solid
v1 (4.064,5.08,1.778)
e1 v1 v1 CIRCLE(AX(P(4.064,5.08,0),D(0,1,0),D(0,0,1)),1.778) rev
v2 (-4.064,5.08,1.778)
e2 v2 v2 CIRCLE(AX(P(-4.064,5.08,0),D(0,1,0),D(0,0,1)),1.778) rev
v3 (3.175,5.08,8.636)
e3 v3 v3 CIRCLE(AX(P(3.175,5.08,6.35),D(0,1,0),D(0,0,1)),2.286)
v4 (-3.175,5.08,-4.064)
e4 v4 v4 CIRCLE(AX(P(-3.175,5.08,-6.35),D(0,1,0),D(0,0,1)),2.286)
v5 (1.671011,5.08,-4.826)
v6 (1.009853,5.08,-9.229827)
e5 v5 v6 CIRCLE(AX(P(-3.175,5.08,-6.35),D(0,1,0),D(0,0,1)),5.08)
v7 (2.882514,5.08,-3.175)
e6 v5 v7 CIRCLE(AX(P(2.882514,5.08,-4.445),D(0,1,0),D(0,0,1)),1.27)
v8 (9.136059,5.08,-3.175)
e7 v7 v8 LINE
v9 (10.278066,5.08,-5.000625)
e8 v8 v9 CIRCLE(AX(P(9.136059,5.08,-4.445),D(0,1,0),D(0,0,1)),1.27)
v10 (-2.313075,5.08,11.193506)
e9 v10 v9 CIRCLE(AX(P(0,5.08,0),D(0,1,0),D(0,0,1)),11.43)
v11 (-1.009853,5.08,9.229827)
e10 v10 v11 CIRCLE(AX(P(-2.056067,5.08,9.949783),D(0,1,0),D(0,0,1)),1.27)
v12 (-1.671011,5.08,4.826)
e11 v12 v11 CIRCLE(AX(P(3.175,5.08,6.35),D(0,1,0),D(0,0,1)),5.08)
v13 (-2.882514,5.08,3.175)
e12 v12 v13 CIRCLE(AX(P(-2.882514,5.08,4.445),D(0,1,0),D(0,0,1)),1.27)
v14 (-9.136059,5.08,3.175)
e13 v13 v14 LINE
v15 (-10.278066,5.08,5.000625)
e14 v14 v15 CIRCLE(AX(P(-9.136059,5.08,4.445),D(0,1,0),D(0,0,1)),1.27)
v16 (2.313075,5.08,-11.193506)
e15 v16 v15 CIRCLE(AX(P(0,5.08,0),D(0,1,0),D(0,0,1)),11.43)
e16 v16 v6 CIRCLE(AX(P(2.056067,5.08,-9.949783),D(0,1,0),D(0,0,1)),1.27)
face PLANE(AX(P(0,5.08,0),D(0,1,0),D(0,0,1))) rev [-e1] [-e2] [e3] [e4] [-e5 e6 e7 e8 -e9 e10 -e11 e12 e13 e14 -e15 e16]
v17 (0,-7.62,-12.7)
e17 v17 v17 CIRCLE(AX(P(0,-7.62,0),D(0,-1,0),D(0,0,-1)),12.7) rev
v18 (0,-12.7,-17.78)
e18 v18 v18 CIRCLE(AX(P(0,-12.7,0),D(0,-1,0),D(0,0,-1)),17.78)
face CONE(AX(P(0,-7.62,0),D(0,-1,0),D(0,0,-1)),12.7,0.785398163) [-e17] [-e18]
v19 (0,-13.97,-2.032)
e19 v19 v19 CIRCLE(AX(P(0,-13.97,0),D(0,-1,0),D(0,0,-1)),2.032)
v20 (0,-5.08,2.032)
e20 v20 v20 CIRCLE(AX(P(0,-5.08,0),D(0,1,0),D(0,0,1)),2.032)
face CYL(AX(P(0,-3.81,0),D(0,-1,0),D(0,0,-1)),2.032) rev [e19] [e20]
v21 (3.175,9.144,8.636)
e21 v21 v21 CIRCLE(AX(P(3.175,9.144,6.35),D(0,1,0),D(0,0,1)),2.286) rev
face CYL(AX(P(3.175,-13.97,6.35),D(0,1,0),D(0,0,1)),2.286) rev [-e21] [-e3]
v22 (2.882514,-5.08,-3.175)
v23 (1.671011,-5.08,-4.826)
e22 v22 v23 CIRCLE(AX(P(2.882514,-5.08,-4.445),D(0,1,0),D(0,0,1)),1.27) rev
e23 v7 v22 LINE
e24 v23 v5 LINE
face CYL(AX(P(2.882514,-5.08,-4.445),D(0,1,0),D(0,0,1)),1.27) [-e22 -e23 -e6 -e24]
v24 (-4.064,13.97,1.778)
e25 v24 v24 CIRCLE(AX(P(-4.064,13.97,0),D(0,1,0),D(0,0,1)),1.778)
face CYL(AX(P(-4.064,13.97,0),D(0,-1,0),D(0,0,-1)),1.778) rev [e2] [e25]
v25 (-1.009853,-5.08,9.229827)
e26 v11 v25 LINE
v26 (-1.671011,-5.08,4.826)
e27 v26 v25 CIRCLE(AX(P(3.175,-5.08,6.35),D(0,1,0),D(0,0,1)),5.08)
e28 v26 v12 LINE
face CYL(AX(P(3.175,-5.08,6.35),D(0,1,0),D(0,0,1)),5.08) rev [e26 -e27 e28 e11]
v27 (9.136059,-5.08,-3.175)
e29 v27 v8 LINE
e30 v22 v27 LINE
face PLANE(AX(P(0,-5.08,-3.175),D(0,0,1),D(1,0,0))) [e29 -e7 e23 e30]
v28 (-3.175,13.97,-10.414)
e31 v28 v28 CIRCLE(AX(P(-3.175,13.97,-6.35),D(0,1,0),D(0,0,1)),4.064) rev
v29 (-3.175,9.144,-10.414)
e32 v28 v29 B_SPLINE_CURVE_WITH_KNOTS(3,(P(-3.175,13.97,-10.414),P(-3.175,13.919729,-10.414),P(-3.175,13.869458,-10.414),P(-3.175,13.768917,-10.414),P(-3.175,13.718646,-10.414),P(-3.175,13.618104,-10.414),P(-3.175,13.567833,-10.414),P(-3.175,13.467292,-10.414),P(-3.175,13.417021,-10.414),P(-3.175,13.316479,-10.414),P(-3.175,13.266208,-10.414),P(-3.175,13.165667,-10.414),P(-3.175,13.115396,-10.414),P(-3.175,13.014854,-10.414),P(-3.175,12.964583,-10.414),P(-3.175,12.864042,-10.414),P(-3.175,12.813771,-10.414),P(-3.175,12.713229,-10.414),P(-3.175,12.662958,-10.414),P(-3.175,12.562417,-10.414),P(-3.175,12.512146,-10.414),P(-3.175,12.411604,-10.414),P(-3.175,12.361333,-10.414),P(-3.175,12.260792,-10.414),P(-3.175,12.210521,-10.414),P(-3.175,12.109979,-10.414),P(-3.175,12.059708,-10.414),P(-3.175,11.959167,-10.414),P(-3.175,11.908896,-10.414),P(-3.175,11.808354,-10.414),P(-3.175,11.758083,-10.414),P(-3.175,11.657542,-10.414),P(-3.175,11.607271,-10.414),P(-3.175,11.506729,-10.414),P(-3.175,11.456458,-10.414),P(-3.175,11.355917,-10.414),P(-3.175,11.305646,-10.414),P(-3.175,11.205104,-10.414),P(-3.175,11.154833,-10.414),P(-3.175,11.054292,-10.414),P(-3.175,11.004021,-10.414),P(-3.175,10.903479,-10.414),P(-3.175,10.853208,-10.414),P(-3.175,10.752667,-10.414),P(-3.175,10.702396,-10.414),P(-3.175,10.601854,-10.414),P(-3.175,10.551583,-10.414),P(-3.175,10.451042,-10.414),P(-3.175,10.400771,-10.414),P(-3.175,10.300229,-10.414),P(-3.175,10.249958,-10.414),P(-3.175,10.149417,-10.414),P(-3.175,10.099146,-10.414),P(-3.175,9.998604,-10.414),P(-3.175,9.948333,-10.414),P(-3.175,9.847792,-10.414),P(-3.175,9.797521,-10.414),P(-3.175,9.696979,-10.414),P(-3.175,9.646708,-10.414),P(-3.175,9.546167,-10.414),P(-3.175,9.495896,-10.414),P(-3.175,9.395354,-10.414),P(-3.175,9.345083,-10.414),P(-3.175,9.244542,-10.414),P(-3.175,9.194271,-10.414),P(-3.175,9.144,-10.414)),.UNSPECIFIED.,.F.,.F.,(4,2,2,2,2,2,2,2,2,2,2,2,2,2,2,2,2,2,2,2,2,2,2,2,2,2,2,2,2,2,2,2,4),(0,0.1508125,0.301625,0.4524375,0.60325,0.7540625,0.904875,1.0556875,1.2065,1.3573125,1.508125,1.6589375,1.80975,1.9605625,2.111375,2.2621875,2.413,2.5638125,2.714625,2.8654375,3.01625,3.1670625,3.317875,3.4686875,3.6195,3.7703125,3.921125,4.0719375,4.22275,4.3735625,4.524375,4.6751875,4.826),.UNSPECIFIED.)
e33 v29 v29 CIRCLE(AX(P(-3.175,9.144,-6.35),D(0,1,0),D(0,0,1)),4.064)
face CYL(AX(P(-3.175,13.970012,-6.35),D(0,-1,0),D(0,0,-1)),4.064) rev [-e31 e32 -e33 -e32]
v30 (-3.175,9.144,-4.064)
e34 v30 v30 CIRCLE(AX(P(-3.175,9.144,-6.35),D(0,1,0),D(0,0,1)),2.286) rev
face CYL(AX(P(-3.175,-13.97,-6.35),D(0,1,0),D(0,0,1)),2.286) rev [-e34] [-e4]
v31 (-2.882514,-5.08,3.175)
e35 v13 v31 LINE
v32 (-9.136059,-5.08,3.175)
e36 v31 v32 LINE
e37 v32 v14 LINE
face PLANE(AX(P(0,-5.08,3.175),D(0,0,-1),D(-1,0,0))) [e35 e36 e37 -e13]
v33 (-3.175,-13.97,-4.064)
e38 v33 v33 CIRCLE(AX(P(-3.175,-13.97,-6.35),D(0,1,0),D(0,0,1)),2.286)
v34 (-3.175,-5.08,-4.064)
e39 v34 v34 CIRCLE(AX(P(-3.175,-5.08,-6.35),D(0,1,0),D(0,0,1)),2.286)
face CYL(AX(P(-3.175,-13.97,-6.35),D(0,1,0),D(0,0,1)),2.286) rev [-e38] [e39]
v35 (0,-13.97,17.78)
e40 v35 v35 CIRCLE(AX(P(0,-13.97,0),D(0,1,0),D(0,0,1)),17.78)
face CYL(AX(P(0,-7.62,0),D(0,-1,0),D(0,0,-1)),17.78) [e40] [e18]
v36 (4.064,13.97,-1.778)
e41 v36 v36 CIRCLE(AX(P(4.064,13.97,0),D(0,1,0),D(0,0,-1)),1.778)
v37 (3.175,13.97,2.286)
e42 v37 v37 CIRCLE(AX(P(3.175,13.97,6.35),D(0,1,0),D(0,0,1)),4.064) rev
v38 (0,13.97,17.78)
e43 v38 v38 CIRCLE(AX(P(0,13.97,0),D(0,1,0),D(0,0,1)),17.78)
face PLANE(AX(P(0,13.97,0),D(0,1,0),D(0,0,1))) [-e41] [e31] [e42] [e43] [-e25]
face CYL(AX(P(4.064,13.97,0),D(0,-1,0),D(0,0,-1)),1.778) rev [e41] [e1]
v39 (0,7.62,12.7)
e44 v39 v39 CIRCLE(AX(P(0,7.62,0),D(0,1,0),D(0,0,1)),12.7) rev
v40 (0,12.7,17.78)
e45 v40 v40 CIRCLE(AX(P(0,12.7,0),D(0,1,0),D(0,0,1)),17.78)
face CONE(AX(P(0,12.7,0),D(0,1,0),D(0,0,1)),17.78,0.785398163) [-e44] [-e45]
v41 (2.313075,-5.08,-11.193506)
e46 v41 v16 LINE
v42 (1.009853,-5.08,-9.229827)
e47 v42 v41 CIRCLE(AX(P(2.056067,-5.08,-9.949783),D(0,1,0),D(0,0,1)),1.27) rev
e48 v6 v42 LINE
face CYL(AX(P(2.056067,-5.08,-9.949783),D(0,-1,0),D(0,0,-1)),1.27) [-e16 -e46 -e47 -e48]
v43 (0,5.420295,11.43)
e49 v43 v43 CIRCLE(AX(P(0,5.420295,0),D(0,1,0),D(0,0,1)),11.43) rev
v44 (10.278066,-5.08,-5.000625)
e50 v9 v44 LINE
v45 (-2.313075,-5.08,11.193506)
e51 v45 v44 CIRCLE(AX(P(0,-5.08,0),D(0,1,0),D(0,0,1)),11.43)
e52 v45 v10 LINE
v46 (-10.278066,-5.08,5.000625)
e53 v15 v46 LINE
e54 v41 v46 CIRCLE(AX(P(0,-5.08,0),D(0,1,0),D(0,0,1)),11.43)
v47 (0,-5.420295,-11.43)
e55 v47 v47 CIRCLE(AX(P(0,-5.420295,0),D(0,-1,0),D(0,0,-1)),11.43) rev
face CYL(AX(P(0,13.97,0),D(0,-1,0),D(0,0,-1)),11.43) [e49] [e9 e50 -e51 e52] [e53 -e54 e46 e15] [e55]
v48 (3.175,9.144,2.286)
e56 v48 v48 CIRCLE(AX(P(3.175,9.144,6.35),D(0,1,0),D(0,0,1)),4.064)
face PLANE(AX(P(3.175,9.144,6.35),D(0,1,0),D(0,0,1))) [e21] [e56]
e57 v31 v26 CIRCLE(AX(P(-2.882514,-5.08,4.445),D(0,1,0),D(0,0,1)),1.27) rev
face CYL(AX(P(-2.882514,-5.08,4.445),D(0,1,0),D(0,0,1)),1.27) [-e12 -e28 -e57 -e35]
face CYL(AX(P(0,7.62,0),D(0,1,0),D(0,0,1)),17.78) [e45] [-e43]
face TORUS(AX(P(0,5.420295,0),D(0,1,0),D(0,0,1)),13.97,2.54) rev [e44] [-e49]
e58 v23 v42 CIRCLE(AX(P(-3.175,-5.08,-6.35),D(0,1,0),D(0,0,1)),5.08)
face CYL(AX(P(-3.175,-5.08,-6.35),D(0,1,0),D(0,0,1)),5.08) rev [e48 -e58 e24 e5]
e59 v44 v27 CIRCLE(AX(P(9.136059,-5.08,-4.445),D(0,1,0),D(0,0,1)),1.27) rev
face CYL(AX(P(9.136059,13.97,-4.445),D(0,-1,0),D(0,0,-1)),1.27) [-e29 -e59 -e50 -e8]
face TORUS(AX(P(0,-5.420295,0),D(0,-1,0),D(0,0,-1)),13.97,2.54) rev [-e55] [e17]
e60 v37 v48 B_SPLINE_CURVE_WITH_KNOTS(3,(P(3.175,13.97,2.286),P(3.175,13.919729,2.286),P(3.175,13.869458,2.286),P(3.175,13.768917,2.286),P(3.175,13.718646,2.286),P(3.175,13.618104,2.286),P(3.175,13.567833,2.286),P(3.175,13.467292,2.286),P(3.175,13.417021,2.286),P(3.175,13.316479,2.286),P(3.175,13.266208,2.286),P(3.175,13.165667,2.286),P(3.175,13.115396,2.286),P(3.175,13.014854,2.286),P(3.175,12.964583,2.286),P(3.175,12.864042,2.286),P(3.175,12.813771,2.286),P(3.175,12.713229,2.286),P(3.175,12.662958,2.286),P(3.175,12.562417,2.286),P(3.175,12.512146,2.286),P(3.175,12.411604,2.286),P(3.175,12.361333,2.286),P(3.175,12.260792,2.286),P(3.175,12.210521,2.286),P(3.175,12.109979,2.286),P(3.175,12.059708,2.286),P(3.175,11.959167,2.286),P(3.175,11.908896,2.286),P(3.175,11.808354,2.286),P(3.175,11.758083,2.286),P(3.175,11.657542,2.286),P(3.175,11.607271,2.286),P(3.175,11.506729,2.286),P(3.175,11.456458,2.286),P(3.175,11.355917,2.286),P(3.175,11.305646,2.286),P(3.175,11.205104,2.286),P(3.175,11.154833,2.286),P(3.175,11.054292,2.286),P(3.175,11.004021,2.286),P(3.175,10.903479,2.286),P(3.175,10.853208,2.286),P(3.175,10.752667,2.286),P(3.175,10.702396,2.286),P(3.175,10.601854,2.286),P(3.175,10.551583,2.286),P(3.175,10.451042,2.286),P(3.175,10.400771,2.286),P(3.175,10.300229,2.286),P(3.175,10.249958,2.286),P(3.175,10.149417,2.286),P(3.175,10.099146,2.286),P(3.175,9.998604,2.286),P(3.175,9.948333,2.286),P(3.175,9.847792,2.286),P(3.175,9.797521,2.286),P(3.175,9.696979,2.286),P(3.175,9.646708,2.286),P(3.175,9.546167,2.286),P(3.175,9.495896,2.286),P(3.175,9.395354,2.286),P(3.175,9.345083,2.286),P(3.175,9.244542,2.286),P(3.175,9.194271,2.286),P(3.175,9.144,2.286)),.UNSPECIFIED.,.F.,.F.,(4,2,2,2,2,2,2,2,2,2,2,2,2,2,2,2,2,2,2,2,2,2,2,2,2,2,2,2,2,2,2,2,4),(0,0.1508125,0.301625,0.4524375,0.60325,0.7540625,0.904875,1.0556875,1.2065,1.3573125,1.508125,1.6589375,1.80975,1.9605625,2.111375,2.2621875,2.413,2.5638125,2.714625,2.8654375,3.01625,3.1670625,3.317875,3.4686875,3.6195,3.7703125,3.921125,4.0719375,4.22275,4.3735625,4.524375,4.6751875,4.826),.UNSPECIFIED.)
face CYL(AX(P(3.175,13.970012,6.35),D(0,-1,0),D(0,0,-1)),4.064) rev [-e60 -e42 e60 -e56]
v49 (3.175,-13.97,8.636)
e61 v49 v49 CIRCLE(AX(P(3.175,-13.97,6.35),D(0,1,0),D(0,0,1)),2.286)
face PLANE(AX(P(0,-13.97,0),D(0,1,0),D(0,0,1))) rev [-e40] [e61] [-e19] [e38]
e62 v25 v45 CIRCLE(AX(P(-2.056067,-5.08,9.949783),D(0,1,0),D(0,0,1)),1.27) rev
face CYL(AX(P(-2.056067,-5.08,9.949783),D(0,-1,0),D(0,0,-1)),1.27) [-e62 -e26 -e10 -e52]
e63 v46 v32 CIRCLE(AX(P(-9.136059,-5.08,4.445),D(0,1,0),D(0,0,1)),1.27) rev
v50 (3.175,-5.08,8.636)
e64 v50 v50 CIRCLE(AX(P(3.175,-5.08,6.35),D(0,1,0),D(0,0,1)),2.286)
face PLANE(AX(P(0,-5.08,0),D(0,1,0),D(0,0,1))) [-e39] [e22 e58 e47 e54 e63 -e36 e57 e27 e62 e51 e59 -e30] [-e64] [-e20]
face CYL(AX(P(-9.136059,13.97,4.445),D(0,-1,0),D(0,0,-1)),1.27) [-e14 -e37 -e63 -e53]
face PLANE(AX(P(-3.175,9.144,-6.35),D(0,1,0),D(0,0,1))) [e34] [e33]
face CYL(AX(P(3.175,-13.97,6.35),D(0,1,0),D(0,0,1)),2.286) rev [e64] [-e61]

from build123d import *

# Parameters (mm, degrees)
SKETCH1_R               = 11.43
BOSS_EXTRUDE1_DEPTH     = 13.97
CUT_EXTRUDE1_DEPTH      = 5.08
CUT_EXTRUDE2_DEPTH      = 22.364706878
CUT_EXTRUDE2_DEPTH_BACK = 22.364706878
SKETCH3_R               = 2.286
FILLET1_R               = 1.27
SKETCH4_R               = 17.78
SKETCH4_R_2             = 11.43
BOSS_EXTRUDE2_DEPTH     = 6.35
CUT_EXTRUDE3_DEPTH      = 38.588567411
CUT_EXTRUDE3_DEPTH_BACK = 4.826
SKETCH5_R               = 4.064
SKETCH7_R               = 1.778
CUT_EXTRUDE4_DEPTH      = 29.764869198
CHAMFER1_SIZE           = 5.08
FILLET2_R               = 2.54
SKETCH9_R               = 2.032
CUT_EXTRUDE5_DEPTH      = 10.16


with BuildPart() as part:
    # Sketch1 → Boss-Extrude1 (new, symmetric)
    with BuildSketch(Plane(origin=(0, 0, 0), x_dir=(1, 0, 0), z_dir=(0, 1, 0))):
        with Locations(Location((0, 0, 0), (0, 0, 270))):
            Circle(SKETCH1_R)
    extrude(amount=BOSS_EXTRUDE1_DEPTH, both=True)

    # Sketch2 → Cut-Extrude1 (cut, symmetric)
    with BuildSketch(Plane(origin=(0, 0, 0), x_dir=(1, 0, 0), z_dir=(0, 1, 0))):
        with BuildLine():
            Line((10.980176456, 3.175), (0.790573729, 3.175))
            ThreePointArc((0.790573729, 3.175), (1.644174222, 7.956847789), (-1.908379573, 11.269560213))
            ThreePointArc((-1.908379573, 11.269560213), (-9.679362018, 6.079050167), (-10.980176456, -3.175))
            Line((-10.980176456, -3.175), (-0.790573729, -3.175))
            ThreePointArc((-0.790573729, -3.175), (-1.644174222, -7.956847789), (1.908379573, -11.269560213))
            ThreePointArc((1.908379573, -11.269560213), (8.730912854, -7.376724255), (11.43, 0))
            ThreePointArc((11.43, 0), (11.316985396, 1.603353222), (10.980176456, 3.175))
        make_face()
    extrude(amount=CUT_EXTRUDE1_DEPTH, both=True, mode=Mode.SUBTRACT)

    # Sketch3 → Cut-Extrude2 (cut, two sides: drawn at the far end of the back side and taken through both)
    with BuildSketch(Plane(origin=(0, 0, 0), x_dir=(1, 0, 0), z_dir=(0, 1, 0)).offset(-CUT_EXTRUDE2_DEPTH_BACK)):
        with Locations(Location((-3.175, 6.35, 0), (0, 0, 270))):
            Circle(SKETCH3_R)
        with Locations(Location((3.175, -6.35, 0), (0, 0, 270))):
            Circle(SKETCH3_R)
    extrude(amount=CUT_EXTRUDE2_DEPTH + CUT_EXTRUDE2_DEPTH_BACK, mode=Mode.SUBTRACT)

    # Fillet1
    # the kernel refuses this fillet: 1.27 mm, written as the material it takes off along each edge
    with BuildSketch(Plane(origin=(-0.790573729, 5.08, 3.175), x_dir=(-0.4705483235385416, 0, 0.8823742262867087), z_dir=(0, -1, 0))) as fillet1_piece_1:
        with BuildLine():
            CenterArc((2.104974221, 1.248277745), FILLET1_R, 151.930104711, 107.457603124)
            Line((0.984358954, 1.845874115), (0, 0))
            ThreePointArc((0, 0), (0.935544098, 0.086889022), (1.871088197, 0))
        make_face()
    extrude(amount=10.16, mode=Mode.SUBTRACT)
    with BuildSketch(Plane(origin=(-10.980176456, 5.08, 3.175), x_dir=(0.35895527903729396, 0, 0.9333547598053263), z_dir=(0, -1, 0))) as fillet1_piece_2:
        with BuildLine():
            CenterArc((1.847316222, -1.265342552), FILLET1_R, 85.09157022, 115.944479772)
            Line((0.661955677, -1.721215757), (0, 0))
            ThreePointArc((0, 0), (0.977990941, 0.041917031), (1.955981882, 0))
        make_face()
    extrude(amount=10.16, mode=Mode.SUBTRACT)
    with BuildSketch(Plane(origin=(-1.908379573, -5.08, -11.269560213), x_dir=(0.9998377506147018, 0, 0.018013118712026065), z_dir=(0, 1, 0))) as fillet1_piece_3:
        with BuildLine():
            CenterArc((3.987576413, -1.248150652), FILLET1_R, 79.35661856, 136.209501667)
            ThreePointArc((2.954501471, -1.986836082), (1.657014707, -0.726102119), (0, 0))
            ThreePointArc((0, 0), (2.111069866, 0.196644134), (4.222139731, 0))
        make_face()
    extrude(amount=10.16, mode=Mode.SUBTRACT)
    with BuildSketch(Plane(origin=(0.790573729, -5.08, -3.175), x_dir=(1, 0, 0), z_dir=(0, 1, 0))) as fillet1_piece_4:
        with BuildLine():
            CenterArc((2.0919402, 1.27), FILLET1_R, 162.542396876, 107.457603124)
            ThreePointArc((0.880437414, 1.651), (0.516887341, 0.784614516), (0, 0))
            Line((0, 0), (2.0919402, 0))
        make_face()
    extrude(amount=10.16, mode=Mode.SUBTRACT)
    with BuildSketch(Plane(origin=(10.980176456, -5.08, -3.175), x_dir=(-0.3589552790375579, 0, -0.9333547598052248), z_dir=(0, 1, 0))) as fillet1_piece_5:
        with BuildLine():
            CenterArc((1.847316222, 1.265342552), FILLET1_R, 158.963950007, 115.944479772)
            Line((0.661955677, 1.721215757), (0, 0))
            ThreePointArc((0, 0), (0.977990941, -0.041917031), (1.955981882, 0))
        make_face()
    extrude(amount=10.16, mode=Mode.SUBTRACT)
    with BuildSketch(Plane(origin=(1.908379573, 5.08, 11.269560213), x_dir=(-0.9998377506147016, 0, -0.018013118712031834), z_dir=(0, -1, 0))) as fillet1_piece_6:
        with BuildLine():
            CenterArc((3.987576413, 1.248150652), FILLET1_R, 144.433879773, 136.209501667)
            ThreePointArc((2.954501471, 1.986836082), (1.657014707, 0.726102119), (0, 0))
            ThreePointArc((0, 0), (2.111069866, -0.196644134), (4.222139731, 0))
        make_face()
    extrude(amount=10.16, mode=Mode.SUBTRACT)

    # Sketch4 → Boss-Extrude2 (add)
    with BuildSketch(Plane(origin=(0, 13.97, 0), x_dir=(1, 0, 0), z_dir=(0, 1, 0))):
        with Locations(Location((0, 0, 0), (0, 0, 270))):
            Circle(SKETCH4_R)
        with Locations(Location((0, 0, 0), (0, 0, 270))):
            Circle(SKETCH4_R_2, mode=Mode.SUBTRACT)
    boss_extrude2 = extrude(amount=-BOSS_EXTRUDE2_DEPTH)

    # Mirror1: Boss-Extrude2 across plane
    add(boss_extrude2.mirror(Plane.ZX))

    # Sketch5 → Cut-Extrude3 (cut, two sides: drawn at the far end of the back side and taken through both)
    with BuildSketch(Plane(origin=(0, 13.97, 0), x_dir=(1, 0, 0), z_dir=(0, 1, 0)).offset(-CUT_EXTRUDE3_DEPTH_BACK)):
        with Locations(Location((-3.175, 6.35, 0), (0, 0, 90))):
            Circle(SKETCH5_R)
        with Locations(Location((3.175, -6.35, 0), (0, 0, 90))):
            Circle(SKETCH5_R)
    extrude(amount=CUT_EXTRUDE3_DEPTH + CUT_EXTRUDE3_DEPTH_BACK, mode=Mode.SUBTRACT)

    # Sketch7 → Cut-Extrude4 (cut, through all)
    with BuildSketch(Plane(origin=(0, 0, 0), x_dir=(1, 0, 0), z_dir=(0, 1, 0))):
        with Locations(Location((-4.064, 0, 0), (0, 0, 270))):
            Circle(SKETCH7_R)
        with Locations(Location((4.064, 0, 0), (0, 0, 90))):
            Circle(SKETCH7_R)
    extrude(amount=CUT_EXTRUDE4_DEPTH, mode=Mode.SUBTRACT)

    # Chamfer1
    chamfer1_edges = [part.edges().sort_by_distance(p)[0] for p in [
        (0, 7.62, -17.78),
        (0, -7.62, -17.78),
    ]]
    chamfer(chamfer1_edges, length=CHAMFER1_SIZE)

    # Fillet2
    # the kernel refuses this fillet: 2.54 mm, written as the material it adds along each edge
    with BuildSketch(Plane(origin=(0, 7.62, 0), x_dir=(0, 0, 1), z_dir=(-1, 0, 0))) as fillet2_piece_1:
        with BuildLine():
            CenterArc((13.97, -2.199704526), FILLET2_R, 120, 60)
            Line((12.7, 0), (12.6746, 0.043994091))
            ThreePointArc((12.6746, 0.043994091), (12.065, 0.0508), (11.43, 0.0508))
            Line((11.43, 0.0508), (11.3792, 0))
            Line((11.3792, 0), (11.3792, -2.199704526))
            Line((11.3792, -2.199704526), (11.43, -2.199704526))
        make_face()
    revolve(axis=Axis((0, 7.62, 0), (0, 1, 0)))
    with BuildSketch(Plane(origin=(0, -7.62, 0), x_dir=(0, 0, 1), z_dir=(-1, 0, 0))) as fillet2_piece_2:
        with BuildLine():
            CenterArc((13.97, 2.199704526), FILLET2_R, 180, 60)
            Line((11.43, 2.199704526), (11.3792, 2.199704526))
            Line((11.3792, 2.199704526), (11.3792, 0))
            Line((11.3792, 0), (11.43, -0.0508))
            ThreePointArc((11.43, -0.0508), (12.065, -0.0508), (12.6746, -0.043994091))
            Line((12.6746, -0.043994091), (12.7, 0))
        make_face()
    revolve(axis=Axis((0, -7.62, 0), (0, 1, 0)))

    # Sketch9 → Cut-Extrude5 (cut)
    with BuildSketch(Plane.XZ.offset(13.97)):
        with Locations(Location((0, 0, 0), (0, 0, 270))):
            Circle(SKETCH9_R)
    extrude(amount=-CUT_EXTRUDE5_DEPTH, mode=Mode.SUBTRACT)


solid = part.part
